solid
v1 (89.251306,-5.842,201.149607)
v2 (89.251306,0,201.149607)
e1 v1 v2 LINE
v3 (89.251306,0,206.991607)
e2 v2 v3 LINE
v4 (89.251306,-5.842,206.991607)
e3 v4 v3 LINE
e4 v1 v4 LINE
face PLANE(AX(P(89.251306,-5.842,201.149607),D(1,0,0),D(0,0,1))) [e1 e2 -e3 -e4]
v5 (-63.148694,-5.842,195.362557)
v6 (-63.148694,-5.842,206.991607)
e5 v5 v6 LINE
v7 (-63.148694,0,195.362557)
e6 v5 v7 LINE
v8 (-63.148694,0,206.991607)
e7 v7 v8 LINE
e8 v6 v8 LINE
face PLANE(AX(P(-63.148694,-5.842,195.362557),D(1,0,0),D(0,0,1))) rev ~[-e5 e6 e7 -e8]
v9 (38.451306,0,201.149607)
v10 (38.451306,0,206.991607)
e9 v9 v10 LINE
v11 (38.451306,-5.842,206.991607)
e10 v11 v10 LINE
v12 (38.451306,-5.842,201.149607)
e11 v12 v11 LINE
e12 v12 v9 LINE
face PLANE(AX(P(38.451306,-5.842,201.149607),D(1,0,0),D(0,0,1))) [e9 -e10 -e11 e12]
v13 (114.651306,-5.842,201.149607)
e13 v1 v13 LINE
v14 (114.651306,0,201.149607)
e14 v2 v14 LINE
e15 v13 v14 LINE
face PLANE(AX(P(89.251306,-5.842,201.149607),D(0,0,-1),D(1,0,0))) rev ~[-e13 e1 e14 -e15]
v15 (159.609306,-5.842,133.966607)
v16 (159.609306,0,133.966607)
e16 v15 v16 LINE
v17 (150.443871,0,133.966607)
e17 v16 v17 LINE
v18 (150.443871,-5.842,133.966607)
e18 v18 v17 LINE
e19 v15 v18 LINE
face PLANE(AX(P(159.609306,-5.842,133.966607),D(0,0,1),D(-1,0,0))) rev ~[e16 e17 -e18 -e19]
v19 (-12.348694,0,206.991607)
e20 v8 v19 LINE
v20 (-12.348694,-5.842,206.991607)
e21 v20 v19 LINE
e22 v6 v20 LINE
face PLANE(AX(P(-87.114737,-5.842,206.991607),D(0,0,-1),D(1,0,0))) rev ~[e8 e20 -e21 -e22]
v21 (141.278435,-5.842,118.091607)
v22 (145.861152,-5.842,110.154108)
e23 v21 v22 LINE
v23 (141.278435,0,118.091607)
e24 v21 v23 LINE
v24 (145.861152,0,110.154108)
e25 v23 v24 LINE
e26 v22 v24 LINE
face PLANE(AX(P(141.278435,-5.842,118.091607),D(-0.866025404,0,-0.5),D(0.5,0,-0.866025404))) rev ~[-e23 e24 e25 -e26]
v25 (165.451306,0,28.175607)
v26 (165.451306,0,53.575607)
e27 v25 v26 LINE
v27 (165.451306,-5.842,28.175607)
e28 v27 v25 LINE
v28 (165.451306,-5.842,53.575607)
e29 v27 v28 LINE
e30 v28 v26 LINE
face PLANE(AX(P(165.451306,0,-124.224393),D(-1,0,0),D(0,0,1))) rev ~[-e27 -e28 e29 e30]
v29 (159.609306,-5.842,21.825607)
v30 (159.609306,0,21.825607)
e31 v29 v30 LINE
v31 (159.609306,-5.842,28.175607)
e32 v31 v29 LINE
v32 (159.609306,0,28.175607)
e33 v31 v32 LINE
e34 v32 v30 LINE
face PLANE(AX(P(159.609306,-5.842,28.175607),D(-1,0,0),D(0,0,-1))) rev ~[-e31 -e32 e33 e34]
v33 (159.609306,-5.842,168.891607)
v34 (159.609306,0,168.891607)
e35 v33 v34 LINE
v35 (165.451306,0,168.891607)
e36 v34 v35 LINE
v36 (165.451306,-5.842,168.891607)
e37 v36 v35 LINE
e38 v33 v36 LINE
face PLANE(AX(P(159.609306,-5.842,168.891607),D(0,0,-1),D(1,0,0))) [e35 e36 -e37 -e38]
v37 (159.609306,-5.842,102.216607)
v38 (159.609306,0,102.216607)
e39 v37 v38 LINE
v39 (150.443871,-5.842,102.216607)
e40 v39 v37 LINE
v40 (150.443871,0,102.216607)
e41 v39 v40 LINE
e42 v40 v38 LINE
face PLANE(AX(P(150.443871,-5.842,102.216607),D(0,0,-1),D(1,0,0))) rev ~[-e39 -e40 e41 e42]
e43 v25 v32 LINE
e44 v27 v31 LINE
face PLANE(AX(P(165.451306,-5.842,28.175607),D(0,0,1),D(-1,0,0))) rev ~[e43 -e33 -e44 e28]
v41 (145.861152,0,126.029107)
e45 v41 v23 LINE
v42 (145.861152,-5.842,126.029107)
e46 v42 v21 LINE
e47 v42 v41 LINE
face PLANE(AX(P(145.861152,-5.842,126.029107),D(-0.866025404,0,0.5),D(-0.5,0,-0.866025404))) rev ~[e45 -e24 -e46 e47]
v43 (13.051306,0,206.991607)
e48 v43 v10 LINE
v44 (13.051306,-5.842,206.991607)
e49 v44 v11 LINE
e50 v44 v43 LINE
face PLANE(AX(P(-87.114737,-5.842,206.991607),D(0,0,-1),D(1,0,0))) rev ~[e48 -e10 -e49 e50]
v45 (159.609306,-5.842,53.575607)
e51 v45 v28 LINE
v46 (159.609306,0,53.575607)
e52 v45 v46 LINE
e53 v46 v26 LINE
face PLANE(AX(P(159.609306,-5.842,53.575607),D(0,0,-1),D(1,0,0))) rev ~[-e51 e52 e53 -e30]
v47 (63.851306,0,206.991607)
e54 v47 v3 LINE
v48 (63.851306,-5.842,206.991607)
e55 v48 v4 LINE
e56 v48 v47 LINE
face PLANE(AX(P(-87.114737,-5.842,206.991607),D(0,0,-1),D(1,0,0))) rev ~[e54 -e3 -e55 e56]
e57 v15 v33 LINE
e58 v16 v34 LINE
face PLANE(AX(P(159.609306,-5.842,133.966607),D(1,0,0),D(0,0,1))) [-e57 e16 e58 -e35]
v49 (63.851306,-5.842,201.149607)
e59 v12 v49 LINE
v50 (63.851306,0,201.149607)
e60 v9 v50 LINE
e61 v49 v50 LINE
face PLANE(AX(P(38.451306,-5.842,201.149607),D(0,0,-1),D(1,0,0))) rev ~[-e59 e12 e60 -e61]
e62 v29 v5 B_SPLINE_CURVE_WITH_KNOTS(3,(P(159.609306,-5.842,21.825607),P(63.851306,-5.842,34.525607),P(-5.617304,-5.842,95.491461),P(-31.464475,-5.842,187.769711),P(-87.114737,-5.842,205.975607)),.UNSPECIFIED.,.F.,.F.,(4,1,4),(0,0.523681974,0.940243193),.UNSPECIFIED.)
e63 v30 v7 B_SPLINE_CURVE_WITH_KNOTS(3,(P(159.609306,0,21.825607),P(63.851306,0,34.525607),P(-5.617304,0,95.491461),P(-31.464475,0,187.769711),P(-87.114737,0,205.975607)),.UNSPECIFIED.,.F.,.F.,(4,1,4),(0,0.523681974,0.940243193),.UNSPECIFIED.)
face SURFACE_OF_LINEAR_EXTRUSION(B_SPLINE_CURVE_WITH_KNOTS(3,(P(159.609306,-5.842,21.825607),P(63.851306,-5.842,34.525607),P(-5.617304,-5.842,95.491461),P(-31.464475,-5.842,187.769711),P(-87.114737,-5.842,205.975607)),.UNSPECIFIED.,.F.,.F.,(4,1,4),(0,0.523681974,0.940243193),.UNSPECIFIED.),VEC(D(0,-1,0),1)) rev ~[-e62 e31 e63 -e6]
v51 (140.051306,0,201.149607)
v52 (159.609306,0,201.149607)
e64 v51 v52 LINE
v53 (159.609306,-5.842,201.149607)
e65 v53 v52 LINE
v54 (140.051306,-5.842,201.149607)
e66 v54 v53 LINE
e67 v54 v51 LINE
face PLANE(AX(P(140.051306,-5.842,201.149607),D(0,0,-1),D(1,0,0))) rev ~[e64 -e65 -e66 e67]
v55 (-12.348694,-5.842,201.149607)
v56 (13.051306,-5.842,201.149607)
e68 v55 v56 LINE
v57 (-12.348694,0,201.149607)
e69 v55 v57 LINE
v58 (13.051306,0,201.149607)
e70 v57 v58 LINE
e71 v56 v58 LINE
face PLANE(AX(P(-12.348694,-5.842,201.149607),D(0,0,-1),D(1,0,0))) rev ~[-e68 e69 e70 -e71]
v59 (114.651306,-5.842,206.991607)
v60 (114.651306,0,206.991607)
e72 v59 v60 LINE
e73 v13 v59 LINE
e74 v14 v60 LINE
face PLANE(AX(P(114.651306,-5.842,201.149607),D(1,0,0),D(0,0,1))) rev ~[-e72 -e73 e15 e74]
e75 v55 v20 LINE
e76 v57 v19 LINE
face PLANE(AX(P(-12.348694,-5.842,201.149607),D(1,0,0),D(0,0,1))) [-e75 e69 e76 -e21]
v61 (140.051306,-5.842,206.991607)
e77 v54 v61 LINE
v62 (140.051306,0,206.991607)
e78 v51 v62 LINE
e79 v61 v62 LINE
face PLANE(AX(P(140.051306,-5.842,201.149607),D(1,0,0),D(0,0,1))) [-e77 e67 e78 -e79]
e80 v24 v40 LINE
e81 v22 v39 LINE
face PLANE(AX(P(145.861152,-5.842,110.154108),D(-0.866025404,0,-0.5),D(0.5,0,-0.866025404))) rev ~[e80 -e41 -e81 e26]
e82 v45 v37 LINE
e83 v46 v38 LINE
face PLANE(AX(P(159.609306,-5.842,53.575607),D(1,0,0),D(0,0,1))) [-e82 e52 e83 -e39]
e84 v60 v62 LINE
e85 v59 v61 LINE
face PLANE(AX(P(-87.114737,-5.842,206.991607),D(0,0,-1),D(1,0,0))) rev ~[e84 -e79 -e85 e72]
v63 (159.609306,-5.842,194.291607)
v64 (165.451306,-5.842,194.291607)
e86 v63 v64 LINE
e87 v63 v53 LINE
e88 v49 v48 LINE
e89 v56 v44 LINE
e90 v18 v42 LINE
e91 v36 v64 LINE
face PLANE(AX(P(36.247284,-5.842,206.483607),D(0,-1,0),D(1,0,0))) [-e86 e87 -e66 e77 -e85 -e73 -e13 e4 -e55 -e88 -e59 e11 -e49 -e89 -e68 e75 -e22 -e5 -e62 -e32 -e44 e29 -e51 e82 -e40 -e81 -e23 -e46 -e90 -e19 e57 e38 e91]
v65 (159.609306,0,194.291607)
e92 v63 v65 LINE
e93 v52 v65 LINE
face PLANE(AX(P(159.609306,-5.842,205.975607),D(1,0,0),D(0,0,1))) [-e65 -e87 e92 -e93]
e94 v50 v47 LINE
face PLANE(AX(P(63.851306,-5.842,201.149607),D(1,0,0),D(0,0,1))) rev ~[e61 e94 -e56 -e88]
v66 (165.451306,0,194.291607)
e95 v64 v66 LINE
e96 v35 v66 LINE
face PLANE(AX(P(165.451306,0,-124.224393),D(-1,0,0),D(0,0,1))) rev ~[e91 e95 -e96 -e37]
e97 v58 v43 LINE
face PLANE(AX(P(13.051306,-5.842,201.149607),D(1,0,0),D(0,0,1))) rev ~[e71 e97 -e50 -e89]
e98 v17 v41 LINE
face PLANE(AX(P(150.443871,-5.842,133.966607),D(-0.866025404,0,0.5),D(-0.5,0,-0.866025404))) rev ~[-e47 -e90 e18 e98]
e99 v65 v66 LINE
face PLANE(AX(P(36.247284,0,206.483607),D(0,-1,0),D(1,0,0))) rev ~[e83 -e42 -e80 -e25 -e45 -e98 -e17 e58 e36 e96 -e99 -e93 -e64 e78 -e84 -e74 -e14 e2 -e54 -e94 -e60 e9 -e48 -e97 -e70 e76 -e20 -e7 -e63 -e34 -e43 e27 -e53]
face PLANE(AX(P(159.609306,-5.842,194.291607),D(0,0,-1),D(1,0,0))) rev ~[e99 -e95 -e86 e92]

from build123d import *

# Parameters (mm, degrees)
F0_W      = 279.4
F0_H      = 330.2
F1_DEPTH  = 5.842
F2_W      = 25.4
F2_H      = 5.842
F2_W_2    = 76.2
F2_W_3    = 5.842
F2_H_2    = 25.4
F2_H_3    = 38.1
F3_DEPTH  = 5.842
F5_W      = 5.842
F5_H      = 12.7
F6_DEPTH  = 5.842
F7_DEPTH  = 5.842
F8_W      = 5.842
F8_H      = 48.641
F8_H_2    = 34.925
F8_H_3    = 11.684
F9_DEPTH  = 5.842
F10_W     = 246.7240431406
F10_H     = 1.016
F11_DEPTH = 5.842
F12_W     = 25.4
F12_H     = 5.842
F12_W_2   = 19.558
F13_DEPTH = 5.842


with BuildPart() as f1:
    # F0 (on Front) → F1 (new body)
    with BuildSketch(Plane.XZ):
        with Locations((25.751306051, 40.8756073241)):
            Rectangle(F0_W, F0_H)
    extrude(amount=F1_DEPTH)

    # F2 (on face) → F3 (cut, through all)
    with BuildSketch(Plane.XZ.offset(5.842)):
        with Locations((152.751306051, -121.3033926759)):
            Rectangle(F2_W, F2_H)
        with Locations((101.951306051, -121.3033926759)):
            Rectangle(F2_W, F2_H)
        with Locations((51.151306051, -121.3033926759)):
            Rectangle(F2_W, F2_H)
        with Locations((0.351306051, -121.3033926759)):
            Rectangle(F2_W, F2_H)
        with Locations((-75.848693949, -121.3033926759)):
            Rectangle(F2_W_2, F2_H)
        with Locations((162.530306051, -86.1243926759)):
            Rectangle(F2_W_3, F2_H_2)
        with Locations((162.530306051, -28.9743926759)):
            Rectangle(F2_W_3, F2_H_3)
        with Locations((-111.027693949, -86.1243926759)):
            Rectangle(F2_W_3, F2_H_2)
        with Locations((-111.027693949, -35.3243926759)):
            Rectangle(F2_W_3, F2_H_2)
        with Locations((-111.027693949, 15.4756073241)):
            Rectangle(F2_W_3, F2_H_2)
        with Locations((-111.027693949, 66.2756073241)):
            Rectangle(F2_W_3, F2_H_2)
        with Locations((-111.027693949, 167.8756073241)):
            Rectangle(F2_W_3, F2_H_2)
        with Locations((-111.027693949, 117.0756073241)):
            Rectangle(F2_W_3, F2_H_2)
    extrude(amount=-F3_DEPTH, mode=Mode.SUBTRACT)

    # F5 (on face) → F6 (cut, through all)
    with BuildSketch(Plane.XZ.offset(5.842)):
        with Locations((162.530306051, 2.7756073241)):
            Rectangle(F5_W, F5_H)
    extrude(amount=-F6_DEPTH, mode=Mode.SUBTRACT)

    # F4 (on face) → F7 (cut, through all)
    with BuildSketch(Plane.XZ.offset(5.842)):
        with BuildLine():
            Line((165.451306051, 15.4756073241), (159.609306051, 15.4756073241))
            add(Edge.make_bspline(
                [(159.609306051, 15.4756073241), (73.376306051, 28.1756073241), (-24.3765935073, 60.3637718481), (-21.873693949, 193.2756073241), (-113.948693949, 205.9756073241)],
                knots=[0, 0, 0, 0, 0.507272, 1, 1, 1, 1], degree=3))
            Line((-113.948693949, 205.9756073241), (-113.948693949, 180.5756073241))
            Line((-113.948693949, 180.5756073241), (-108.106693949, 180.5756073241))
            Line((-108.106693949, 180.5756073241), (-108.106693949, 155.1756073241))
            Line((-108.106693949, 155.1756073241), (-113.948693949, 155.1756073241))
            Line((-113.948693949, 155.1756073241), (-113.948693949, 129.7756073241))
            Line((-113.948693949, 129.7756073241), (-108.106693949, 129.7756073241))
            Line((-108.106693949, 129.7756073241), (-108.106693949, 104.3756073241))
            Line((-108.106693949, 104.3756073241), (-113.948693949, 104.3756073241))
            Line((-113.948693949, 104.3756073241), (-113.948693949, 78.9756073241))
            Line((-113.948693949, 78.9756073241), (-108.106693949, 78.9756073241))
            Line((-108.106693949, 78.9756073241), (-108.106693949, 53.5756073241))
            Line((-108.106693949, 53.5756073241), (-113.948693949, 53.5756073241))
            Line((-113.948693949, 53.5756073241), (-113.948693949, 28.1756073241))
            Line((-113.948693949, 28.1756073241), (-108.106693949, 28.1756073241))
            Line((-108.106693949, 28.1756073241), (-108.106693949, 2.7756073241))
            Line((-108.106693949, 2.7756073241), (-113.948693949, 2.7756073241))
            Line((-113.948693949, 2.7756073241), (-113.948693949, -22.6243926759))
            Line((-113.948693949, -22.6243926759), (-108.106693949, -22.6243926759))
            Line((-108.106693949, -22.6243926759), (-108.106693949, -48.0243926759))
            Line((-108.106693949, -48.0243926759), (-113.948693949, -48.0243926759))
            Line((-113.948693949, -48.0243926759), (-113.948693949, -73.4243926759))
            Line((-113.948693949, -73.4243926759), (-108.106693949, -73.4243926759))
            Line((-108.106693949, -73.4243926759), (-108.106693949, -98.8243926759))
            Line((-108.106693949, -98.8243926759), (-113.948693949, -98.8243926759))
            Line((-113.948693949, -98.8243926759), (-113.948693949, -118.3823926759))
            Line((-113.948693949, -118.3823926759), (-37.748693949, -118.3823926759))
            Line((-37.748693949, -118.3823926759), (-37.748693949, -124.2243926759))
            Line((-37.748693949, -124.2243926759), (-12.348693949, -124.2243926759))
            Line((-12.348693949, -124.2243926759), (-12.348693949, -118.3823926759))
            Line((-12.348693949, -118.3823926759), (13.051306051, -118.3823926759))
            Line((13.051306051, -118.3823926759), (13.051306051, -124.2243926759))
            Line((13.051306051, -124.2243926759), (38.451306051, -124.2243926759))
            Line((38.451306051, -124.2243926759), (38.451306051, -118.3823926759))
            Line((38.451306051, -118.3823926759), (63.851306051, -118.3823926759))
            Line((63.851306051, -118.3823926759), (63.851306051, -124.2243926759))
            Line((63.851306051, -124.2243926759), (89.251306051, -124.2243926759))
            Line((89.251306051, -124.2243926759), (89.251306051, -118.3823926759))
            Line((89.251306051, -118.3823926759), (114.651306051, -118.3823926759))
            Line((114.651306051, -118.3823926759), (114.651306051, -124.2243926759))
            Line((114.651306051, -124.2243926759), (140.051306051, -124.2243926759))
            Line((140.051306051, -124.2243926759), (140.051306051, -118.3823926759))
            Line((140.051306051, -118.3823926759), (165.451306051, -118.3823926759))
            Line((165.451306051, -118.3823926759), (165.451306051, -98.8243926759))
            Line((165.451306051, -98.8243926759), (159.609306051, -98.8243926759))
            Line((159.609306051, -98.8243926759), (159.609306051, -73.4243926759))
            Line((159.609306051, -73.4243926759), (165.451306051, -73.4243926759))
            Line((165.451306051, -73.4243926759), (165.451306051, -48.0243926759))
            Line((165.451306051, -48.0243926759), (159.609306051, -48.0243926759))
            Line((159.609306051, -48.0243926759), (159.609306051, -9.9243926759))
            Line((159.609306051, -9.9243926759), (165.451306051, -9.9243926759))
            Line((165.451306051, -9.9243926759), (165.451306051, 15.4756073241))
        make_face()
        with BuildLine():
            add(Edge.make_bspline(
                [(159.609306051, 15.4756073241), (73.376306051, 28.1756073241), (-24.3765935073, 60.3637718481), (-21.873693949, 193.2756073241), (-113.948693949, 205.9756073241)],
                knots=[0, 0, 0, 0, 0.507272, 1, 1, 1, 1], degree=3))
            Line((159.609306051, 15.4756073241), (159.609306051, 21.8256073241))
            add(Edge.make_bspline(
                [(159.609306051, 21.8256073241), (63.851306051, 34.5256073241), (-5.6173037023, 95.4914607938), (-31.4644745687, 187.7697107475), (-87.114737086, 205.9756073241)],
                knots=[0, 0, 0, 0, 0.5236819738, 0.940243193, 0.940243193, 0.940243193, 0.940243193], degree=3))
            Line((-87.114737086, 205.9756073241), (-113.948693949, 205.9756073241))
        make_face()
    extrude(amount=-F7_DEPTH, mode=Mode.SUBTRACT)

    # F8 (on face) → F9 (cut, through all)
    with BuildSketch(Plane.XZ.offset(5.842)):
        Polygon((165.451306051, 15.4756073241), (165.451306051, 28.1756073241), (159.609306051, 28.1756073241), (159.609306051, 21.8256073241), (159.609306051, 15.4756073241), align=None)
        with Locations((162.530306051, 77.8961073241)):
            Rectangle(F8_W, F8_H)
        with BuildLine():
            Line((159.609306051, 102.2166073241), (165.451306051, 102.2166073241))
            Line((165.451306051, 102.2166073241), (165.451306051, 103.3306229057))
            ThreePointArc((165.451306051, 103.3306229057), (162.5829399691, 102.4975980153), (159.609306051, 102.2166073241))
        make_face()
        with BuildLine():
            ThreePointArc((145.861152343, 110.1541080567), (151.6718056847, 104.3434542505), (159.609306051, 102.2166073241))
            Line((159.609306051, 102.2166073241), (159.609306051, 133.9666073241))
            ThreePointArc((159.609306051, 133.9666073241), (151.6718056847, 131.8397603977), (145.861152343, 126.0291065915))
            ThreePointArc((145.861152343, 126.0291065915), (143.734306051, 118.0916073241), (145.861152343, 110.1541080567))
        make_face()
        with BuildLine():
            Line((150.4438705276, 102.2166073241), (159.609306051, 102.2166073241))
            ThreePointArc((159.609306051, 102.2166073241), (151.6718056847, 104.3434542505), (145.861152343, 110.1541080567))
            Line((145.861152343, 110.1541080567), (150.4438705276, 102.2166073241))
        make_face()
        with BuildLine():
            Line((159.609306051, 133.9666073241), (159.609306051, 102.2166073241))
            ThreePointArc((159.609306051, 102.2166073241), (162.5829399691, 102.4975980153), (165.451306051, 103.3306229057))
            Line((165.451306051, 103.3306229057), (165.451306051, 132.8525917425))
            ThreePointArc((165.451306051, 132.8525917425), (162.5829399691, 133.6856166328), (159.609306051, 133.9666073241))
        make_face()
        with BuildLine():
            Line((165.451306051, 133.9666073241), (159.609306051, 133.9666073241))
            ThreePointArc((159.609306051, 133.9666073241), (162.5829399691, 133.6856166328), (165.451306051, 132.8525917425))
            Line((165.451306051, 132.8525917425), (165.451306051, 133.9666073241))
        make_face()
        with BuildLine():
            ThreePointArc((145.861152343, 126.0291065915), (151.6718056847, 131.8397603977), (159.609306051, 133.9666073241))
            Line((159.609306051, 133.9666073241), (150.4438705276, 133.9666073241))
            Line((150.4438705276, 133.9666073241), (145.861152343, 126.0291065915))
        make_face()
        with Locations((162.530306051, 151.4291073241)):
            Rectangle(F8_W, F8_H_2)
        with BuildLine():
            Line((141.2784350042, 118.0916073241), (145.861152343, 110.1541080567))
            ThreePointArc((145.861152343, 110.1541080567), (143.734306051, 118.0916073241), (145.861152343, 126.0291065915))
            Line((145.861152343, 126.0291065915), (141.2784350042, 118.0916073241))
        make_face()
        with Locations((162.530306051, 200.1336073241)):
            Rectangle(F8_W, F8_H_3)
    extrude(amount=-F9_DEPTH, mode=Mode.SUBTRACT)

    # F10 (on face) → F11 (join, through all)
    with BuildSketch(Plane.XZ.offset(5.842)):
        with Locations((36.2472844807, 206.4836073241)):
            Rectangle(F10_W, F10_H)
    extrude(amount=-F11_DEPTH)

    # F12 (on face) → F13 (cut, through all)
    with BuildSketch(Plane.XZ.offset(5.842)):
        with Locations((51.151306051, 204.0706073241)):
            Rectangle(F12_W, F12_H)
        with Locations((101.951306051, 204.0706073241)):
            Rectangle(F12_W, F12_H)
        with Locations((149.830306051, 204.0706073241)):
            Rectangle(F12_W_2, F12_H)
        with BuildLine():
            add(Edge.make_bspline(
                [(-64.0656111495, 195.8912068503), (-64.4986133811, 197.8821506555), (-64.5462177809, 200.9608220943), (-64.8897370896, 206.9916073241)],
                knots=[0.7783755915, 0.7783755915, 0.7783755915, 0.7783755915, 1, 1, 1, 1], degree=3))
            Line((-64.8897370896, 206.9916073241), (-87.1147370896, 206.9916073241))
            Line((-87.1147370896, 206.9916073241), (-87.1147370896, 205.9756073241))
            add(Edge.make_bspline(
                [(-64.0656111419, 195.8912068549), (-70.8038372609, 199.7329606353), (-78.4197996839, 203.1310721158), (-87.114737086, 205.9756073241)],
                knots=[0.8751586172, 0.8751586172, 0.8751586172, 0.8751586172, 0.940243193, 0.940243193, 0.940243193, 0.940243193], degree=3))
        make_face()
        with Locations((0.351306051, 204.0706073241)):
            Rectangle(F12_W, F12_H)
        with BuildLine():
            Line((-63.148693949, 195.362557311), (-63.148693949, 206.9916073241))
            Line((-63.148693949, 206.9916073241), (-64.8897370896, 206.9916073241))
            add(Edge.make_bspline(
                [(-64.0656111495, 195.8912068503), (-64.4986133811, 197.8821506555), (-64.5462177809, 200.9608220943), (-64.8897370896, 206.9916073241)],
                knots=[0.7783755915, 0.7783755915, 0.7783755915, 0.7783755915, 1, 1, 1, 1], degree=3))
            add(Edge.make_bspline(
                [(-63.148693949, 195.362557311), (-63.4525182871, 195.5396905387), (-63.7581509788, 195.7159105346), (-64.0656111419, 195.8912068549)],
                knots=[0.8721888572, 0.8721888572, 0.8721888572, 0.8721888572, 0.8751586172, 0.8751586172, 0.8751586172, 0.8751586172], degree=3))
        make_face()
    extrude(amount=-F13_DEPTH, mode=Mode.SUBTRACT)


solid = f1.part
